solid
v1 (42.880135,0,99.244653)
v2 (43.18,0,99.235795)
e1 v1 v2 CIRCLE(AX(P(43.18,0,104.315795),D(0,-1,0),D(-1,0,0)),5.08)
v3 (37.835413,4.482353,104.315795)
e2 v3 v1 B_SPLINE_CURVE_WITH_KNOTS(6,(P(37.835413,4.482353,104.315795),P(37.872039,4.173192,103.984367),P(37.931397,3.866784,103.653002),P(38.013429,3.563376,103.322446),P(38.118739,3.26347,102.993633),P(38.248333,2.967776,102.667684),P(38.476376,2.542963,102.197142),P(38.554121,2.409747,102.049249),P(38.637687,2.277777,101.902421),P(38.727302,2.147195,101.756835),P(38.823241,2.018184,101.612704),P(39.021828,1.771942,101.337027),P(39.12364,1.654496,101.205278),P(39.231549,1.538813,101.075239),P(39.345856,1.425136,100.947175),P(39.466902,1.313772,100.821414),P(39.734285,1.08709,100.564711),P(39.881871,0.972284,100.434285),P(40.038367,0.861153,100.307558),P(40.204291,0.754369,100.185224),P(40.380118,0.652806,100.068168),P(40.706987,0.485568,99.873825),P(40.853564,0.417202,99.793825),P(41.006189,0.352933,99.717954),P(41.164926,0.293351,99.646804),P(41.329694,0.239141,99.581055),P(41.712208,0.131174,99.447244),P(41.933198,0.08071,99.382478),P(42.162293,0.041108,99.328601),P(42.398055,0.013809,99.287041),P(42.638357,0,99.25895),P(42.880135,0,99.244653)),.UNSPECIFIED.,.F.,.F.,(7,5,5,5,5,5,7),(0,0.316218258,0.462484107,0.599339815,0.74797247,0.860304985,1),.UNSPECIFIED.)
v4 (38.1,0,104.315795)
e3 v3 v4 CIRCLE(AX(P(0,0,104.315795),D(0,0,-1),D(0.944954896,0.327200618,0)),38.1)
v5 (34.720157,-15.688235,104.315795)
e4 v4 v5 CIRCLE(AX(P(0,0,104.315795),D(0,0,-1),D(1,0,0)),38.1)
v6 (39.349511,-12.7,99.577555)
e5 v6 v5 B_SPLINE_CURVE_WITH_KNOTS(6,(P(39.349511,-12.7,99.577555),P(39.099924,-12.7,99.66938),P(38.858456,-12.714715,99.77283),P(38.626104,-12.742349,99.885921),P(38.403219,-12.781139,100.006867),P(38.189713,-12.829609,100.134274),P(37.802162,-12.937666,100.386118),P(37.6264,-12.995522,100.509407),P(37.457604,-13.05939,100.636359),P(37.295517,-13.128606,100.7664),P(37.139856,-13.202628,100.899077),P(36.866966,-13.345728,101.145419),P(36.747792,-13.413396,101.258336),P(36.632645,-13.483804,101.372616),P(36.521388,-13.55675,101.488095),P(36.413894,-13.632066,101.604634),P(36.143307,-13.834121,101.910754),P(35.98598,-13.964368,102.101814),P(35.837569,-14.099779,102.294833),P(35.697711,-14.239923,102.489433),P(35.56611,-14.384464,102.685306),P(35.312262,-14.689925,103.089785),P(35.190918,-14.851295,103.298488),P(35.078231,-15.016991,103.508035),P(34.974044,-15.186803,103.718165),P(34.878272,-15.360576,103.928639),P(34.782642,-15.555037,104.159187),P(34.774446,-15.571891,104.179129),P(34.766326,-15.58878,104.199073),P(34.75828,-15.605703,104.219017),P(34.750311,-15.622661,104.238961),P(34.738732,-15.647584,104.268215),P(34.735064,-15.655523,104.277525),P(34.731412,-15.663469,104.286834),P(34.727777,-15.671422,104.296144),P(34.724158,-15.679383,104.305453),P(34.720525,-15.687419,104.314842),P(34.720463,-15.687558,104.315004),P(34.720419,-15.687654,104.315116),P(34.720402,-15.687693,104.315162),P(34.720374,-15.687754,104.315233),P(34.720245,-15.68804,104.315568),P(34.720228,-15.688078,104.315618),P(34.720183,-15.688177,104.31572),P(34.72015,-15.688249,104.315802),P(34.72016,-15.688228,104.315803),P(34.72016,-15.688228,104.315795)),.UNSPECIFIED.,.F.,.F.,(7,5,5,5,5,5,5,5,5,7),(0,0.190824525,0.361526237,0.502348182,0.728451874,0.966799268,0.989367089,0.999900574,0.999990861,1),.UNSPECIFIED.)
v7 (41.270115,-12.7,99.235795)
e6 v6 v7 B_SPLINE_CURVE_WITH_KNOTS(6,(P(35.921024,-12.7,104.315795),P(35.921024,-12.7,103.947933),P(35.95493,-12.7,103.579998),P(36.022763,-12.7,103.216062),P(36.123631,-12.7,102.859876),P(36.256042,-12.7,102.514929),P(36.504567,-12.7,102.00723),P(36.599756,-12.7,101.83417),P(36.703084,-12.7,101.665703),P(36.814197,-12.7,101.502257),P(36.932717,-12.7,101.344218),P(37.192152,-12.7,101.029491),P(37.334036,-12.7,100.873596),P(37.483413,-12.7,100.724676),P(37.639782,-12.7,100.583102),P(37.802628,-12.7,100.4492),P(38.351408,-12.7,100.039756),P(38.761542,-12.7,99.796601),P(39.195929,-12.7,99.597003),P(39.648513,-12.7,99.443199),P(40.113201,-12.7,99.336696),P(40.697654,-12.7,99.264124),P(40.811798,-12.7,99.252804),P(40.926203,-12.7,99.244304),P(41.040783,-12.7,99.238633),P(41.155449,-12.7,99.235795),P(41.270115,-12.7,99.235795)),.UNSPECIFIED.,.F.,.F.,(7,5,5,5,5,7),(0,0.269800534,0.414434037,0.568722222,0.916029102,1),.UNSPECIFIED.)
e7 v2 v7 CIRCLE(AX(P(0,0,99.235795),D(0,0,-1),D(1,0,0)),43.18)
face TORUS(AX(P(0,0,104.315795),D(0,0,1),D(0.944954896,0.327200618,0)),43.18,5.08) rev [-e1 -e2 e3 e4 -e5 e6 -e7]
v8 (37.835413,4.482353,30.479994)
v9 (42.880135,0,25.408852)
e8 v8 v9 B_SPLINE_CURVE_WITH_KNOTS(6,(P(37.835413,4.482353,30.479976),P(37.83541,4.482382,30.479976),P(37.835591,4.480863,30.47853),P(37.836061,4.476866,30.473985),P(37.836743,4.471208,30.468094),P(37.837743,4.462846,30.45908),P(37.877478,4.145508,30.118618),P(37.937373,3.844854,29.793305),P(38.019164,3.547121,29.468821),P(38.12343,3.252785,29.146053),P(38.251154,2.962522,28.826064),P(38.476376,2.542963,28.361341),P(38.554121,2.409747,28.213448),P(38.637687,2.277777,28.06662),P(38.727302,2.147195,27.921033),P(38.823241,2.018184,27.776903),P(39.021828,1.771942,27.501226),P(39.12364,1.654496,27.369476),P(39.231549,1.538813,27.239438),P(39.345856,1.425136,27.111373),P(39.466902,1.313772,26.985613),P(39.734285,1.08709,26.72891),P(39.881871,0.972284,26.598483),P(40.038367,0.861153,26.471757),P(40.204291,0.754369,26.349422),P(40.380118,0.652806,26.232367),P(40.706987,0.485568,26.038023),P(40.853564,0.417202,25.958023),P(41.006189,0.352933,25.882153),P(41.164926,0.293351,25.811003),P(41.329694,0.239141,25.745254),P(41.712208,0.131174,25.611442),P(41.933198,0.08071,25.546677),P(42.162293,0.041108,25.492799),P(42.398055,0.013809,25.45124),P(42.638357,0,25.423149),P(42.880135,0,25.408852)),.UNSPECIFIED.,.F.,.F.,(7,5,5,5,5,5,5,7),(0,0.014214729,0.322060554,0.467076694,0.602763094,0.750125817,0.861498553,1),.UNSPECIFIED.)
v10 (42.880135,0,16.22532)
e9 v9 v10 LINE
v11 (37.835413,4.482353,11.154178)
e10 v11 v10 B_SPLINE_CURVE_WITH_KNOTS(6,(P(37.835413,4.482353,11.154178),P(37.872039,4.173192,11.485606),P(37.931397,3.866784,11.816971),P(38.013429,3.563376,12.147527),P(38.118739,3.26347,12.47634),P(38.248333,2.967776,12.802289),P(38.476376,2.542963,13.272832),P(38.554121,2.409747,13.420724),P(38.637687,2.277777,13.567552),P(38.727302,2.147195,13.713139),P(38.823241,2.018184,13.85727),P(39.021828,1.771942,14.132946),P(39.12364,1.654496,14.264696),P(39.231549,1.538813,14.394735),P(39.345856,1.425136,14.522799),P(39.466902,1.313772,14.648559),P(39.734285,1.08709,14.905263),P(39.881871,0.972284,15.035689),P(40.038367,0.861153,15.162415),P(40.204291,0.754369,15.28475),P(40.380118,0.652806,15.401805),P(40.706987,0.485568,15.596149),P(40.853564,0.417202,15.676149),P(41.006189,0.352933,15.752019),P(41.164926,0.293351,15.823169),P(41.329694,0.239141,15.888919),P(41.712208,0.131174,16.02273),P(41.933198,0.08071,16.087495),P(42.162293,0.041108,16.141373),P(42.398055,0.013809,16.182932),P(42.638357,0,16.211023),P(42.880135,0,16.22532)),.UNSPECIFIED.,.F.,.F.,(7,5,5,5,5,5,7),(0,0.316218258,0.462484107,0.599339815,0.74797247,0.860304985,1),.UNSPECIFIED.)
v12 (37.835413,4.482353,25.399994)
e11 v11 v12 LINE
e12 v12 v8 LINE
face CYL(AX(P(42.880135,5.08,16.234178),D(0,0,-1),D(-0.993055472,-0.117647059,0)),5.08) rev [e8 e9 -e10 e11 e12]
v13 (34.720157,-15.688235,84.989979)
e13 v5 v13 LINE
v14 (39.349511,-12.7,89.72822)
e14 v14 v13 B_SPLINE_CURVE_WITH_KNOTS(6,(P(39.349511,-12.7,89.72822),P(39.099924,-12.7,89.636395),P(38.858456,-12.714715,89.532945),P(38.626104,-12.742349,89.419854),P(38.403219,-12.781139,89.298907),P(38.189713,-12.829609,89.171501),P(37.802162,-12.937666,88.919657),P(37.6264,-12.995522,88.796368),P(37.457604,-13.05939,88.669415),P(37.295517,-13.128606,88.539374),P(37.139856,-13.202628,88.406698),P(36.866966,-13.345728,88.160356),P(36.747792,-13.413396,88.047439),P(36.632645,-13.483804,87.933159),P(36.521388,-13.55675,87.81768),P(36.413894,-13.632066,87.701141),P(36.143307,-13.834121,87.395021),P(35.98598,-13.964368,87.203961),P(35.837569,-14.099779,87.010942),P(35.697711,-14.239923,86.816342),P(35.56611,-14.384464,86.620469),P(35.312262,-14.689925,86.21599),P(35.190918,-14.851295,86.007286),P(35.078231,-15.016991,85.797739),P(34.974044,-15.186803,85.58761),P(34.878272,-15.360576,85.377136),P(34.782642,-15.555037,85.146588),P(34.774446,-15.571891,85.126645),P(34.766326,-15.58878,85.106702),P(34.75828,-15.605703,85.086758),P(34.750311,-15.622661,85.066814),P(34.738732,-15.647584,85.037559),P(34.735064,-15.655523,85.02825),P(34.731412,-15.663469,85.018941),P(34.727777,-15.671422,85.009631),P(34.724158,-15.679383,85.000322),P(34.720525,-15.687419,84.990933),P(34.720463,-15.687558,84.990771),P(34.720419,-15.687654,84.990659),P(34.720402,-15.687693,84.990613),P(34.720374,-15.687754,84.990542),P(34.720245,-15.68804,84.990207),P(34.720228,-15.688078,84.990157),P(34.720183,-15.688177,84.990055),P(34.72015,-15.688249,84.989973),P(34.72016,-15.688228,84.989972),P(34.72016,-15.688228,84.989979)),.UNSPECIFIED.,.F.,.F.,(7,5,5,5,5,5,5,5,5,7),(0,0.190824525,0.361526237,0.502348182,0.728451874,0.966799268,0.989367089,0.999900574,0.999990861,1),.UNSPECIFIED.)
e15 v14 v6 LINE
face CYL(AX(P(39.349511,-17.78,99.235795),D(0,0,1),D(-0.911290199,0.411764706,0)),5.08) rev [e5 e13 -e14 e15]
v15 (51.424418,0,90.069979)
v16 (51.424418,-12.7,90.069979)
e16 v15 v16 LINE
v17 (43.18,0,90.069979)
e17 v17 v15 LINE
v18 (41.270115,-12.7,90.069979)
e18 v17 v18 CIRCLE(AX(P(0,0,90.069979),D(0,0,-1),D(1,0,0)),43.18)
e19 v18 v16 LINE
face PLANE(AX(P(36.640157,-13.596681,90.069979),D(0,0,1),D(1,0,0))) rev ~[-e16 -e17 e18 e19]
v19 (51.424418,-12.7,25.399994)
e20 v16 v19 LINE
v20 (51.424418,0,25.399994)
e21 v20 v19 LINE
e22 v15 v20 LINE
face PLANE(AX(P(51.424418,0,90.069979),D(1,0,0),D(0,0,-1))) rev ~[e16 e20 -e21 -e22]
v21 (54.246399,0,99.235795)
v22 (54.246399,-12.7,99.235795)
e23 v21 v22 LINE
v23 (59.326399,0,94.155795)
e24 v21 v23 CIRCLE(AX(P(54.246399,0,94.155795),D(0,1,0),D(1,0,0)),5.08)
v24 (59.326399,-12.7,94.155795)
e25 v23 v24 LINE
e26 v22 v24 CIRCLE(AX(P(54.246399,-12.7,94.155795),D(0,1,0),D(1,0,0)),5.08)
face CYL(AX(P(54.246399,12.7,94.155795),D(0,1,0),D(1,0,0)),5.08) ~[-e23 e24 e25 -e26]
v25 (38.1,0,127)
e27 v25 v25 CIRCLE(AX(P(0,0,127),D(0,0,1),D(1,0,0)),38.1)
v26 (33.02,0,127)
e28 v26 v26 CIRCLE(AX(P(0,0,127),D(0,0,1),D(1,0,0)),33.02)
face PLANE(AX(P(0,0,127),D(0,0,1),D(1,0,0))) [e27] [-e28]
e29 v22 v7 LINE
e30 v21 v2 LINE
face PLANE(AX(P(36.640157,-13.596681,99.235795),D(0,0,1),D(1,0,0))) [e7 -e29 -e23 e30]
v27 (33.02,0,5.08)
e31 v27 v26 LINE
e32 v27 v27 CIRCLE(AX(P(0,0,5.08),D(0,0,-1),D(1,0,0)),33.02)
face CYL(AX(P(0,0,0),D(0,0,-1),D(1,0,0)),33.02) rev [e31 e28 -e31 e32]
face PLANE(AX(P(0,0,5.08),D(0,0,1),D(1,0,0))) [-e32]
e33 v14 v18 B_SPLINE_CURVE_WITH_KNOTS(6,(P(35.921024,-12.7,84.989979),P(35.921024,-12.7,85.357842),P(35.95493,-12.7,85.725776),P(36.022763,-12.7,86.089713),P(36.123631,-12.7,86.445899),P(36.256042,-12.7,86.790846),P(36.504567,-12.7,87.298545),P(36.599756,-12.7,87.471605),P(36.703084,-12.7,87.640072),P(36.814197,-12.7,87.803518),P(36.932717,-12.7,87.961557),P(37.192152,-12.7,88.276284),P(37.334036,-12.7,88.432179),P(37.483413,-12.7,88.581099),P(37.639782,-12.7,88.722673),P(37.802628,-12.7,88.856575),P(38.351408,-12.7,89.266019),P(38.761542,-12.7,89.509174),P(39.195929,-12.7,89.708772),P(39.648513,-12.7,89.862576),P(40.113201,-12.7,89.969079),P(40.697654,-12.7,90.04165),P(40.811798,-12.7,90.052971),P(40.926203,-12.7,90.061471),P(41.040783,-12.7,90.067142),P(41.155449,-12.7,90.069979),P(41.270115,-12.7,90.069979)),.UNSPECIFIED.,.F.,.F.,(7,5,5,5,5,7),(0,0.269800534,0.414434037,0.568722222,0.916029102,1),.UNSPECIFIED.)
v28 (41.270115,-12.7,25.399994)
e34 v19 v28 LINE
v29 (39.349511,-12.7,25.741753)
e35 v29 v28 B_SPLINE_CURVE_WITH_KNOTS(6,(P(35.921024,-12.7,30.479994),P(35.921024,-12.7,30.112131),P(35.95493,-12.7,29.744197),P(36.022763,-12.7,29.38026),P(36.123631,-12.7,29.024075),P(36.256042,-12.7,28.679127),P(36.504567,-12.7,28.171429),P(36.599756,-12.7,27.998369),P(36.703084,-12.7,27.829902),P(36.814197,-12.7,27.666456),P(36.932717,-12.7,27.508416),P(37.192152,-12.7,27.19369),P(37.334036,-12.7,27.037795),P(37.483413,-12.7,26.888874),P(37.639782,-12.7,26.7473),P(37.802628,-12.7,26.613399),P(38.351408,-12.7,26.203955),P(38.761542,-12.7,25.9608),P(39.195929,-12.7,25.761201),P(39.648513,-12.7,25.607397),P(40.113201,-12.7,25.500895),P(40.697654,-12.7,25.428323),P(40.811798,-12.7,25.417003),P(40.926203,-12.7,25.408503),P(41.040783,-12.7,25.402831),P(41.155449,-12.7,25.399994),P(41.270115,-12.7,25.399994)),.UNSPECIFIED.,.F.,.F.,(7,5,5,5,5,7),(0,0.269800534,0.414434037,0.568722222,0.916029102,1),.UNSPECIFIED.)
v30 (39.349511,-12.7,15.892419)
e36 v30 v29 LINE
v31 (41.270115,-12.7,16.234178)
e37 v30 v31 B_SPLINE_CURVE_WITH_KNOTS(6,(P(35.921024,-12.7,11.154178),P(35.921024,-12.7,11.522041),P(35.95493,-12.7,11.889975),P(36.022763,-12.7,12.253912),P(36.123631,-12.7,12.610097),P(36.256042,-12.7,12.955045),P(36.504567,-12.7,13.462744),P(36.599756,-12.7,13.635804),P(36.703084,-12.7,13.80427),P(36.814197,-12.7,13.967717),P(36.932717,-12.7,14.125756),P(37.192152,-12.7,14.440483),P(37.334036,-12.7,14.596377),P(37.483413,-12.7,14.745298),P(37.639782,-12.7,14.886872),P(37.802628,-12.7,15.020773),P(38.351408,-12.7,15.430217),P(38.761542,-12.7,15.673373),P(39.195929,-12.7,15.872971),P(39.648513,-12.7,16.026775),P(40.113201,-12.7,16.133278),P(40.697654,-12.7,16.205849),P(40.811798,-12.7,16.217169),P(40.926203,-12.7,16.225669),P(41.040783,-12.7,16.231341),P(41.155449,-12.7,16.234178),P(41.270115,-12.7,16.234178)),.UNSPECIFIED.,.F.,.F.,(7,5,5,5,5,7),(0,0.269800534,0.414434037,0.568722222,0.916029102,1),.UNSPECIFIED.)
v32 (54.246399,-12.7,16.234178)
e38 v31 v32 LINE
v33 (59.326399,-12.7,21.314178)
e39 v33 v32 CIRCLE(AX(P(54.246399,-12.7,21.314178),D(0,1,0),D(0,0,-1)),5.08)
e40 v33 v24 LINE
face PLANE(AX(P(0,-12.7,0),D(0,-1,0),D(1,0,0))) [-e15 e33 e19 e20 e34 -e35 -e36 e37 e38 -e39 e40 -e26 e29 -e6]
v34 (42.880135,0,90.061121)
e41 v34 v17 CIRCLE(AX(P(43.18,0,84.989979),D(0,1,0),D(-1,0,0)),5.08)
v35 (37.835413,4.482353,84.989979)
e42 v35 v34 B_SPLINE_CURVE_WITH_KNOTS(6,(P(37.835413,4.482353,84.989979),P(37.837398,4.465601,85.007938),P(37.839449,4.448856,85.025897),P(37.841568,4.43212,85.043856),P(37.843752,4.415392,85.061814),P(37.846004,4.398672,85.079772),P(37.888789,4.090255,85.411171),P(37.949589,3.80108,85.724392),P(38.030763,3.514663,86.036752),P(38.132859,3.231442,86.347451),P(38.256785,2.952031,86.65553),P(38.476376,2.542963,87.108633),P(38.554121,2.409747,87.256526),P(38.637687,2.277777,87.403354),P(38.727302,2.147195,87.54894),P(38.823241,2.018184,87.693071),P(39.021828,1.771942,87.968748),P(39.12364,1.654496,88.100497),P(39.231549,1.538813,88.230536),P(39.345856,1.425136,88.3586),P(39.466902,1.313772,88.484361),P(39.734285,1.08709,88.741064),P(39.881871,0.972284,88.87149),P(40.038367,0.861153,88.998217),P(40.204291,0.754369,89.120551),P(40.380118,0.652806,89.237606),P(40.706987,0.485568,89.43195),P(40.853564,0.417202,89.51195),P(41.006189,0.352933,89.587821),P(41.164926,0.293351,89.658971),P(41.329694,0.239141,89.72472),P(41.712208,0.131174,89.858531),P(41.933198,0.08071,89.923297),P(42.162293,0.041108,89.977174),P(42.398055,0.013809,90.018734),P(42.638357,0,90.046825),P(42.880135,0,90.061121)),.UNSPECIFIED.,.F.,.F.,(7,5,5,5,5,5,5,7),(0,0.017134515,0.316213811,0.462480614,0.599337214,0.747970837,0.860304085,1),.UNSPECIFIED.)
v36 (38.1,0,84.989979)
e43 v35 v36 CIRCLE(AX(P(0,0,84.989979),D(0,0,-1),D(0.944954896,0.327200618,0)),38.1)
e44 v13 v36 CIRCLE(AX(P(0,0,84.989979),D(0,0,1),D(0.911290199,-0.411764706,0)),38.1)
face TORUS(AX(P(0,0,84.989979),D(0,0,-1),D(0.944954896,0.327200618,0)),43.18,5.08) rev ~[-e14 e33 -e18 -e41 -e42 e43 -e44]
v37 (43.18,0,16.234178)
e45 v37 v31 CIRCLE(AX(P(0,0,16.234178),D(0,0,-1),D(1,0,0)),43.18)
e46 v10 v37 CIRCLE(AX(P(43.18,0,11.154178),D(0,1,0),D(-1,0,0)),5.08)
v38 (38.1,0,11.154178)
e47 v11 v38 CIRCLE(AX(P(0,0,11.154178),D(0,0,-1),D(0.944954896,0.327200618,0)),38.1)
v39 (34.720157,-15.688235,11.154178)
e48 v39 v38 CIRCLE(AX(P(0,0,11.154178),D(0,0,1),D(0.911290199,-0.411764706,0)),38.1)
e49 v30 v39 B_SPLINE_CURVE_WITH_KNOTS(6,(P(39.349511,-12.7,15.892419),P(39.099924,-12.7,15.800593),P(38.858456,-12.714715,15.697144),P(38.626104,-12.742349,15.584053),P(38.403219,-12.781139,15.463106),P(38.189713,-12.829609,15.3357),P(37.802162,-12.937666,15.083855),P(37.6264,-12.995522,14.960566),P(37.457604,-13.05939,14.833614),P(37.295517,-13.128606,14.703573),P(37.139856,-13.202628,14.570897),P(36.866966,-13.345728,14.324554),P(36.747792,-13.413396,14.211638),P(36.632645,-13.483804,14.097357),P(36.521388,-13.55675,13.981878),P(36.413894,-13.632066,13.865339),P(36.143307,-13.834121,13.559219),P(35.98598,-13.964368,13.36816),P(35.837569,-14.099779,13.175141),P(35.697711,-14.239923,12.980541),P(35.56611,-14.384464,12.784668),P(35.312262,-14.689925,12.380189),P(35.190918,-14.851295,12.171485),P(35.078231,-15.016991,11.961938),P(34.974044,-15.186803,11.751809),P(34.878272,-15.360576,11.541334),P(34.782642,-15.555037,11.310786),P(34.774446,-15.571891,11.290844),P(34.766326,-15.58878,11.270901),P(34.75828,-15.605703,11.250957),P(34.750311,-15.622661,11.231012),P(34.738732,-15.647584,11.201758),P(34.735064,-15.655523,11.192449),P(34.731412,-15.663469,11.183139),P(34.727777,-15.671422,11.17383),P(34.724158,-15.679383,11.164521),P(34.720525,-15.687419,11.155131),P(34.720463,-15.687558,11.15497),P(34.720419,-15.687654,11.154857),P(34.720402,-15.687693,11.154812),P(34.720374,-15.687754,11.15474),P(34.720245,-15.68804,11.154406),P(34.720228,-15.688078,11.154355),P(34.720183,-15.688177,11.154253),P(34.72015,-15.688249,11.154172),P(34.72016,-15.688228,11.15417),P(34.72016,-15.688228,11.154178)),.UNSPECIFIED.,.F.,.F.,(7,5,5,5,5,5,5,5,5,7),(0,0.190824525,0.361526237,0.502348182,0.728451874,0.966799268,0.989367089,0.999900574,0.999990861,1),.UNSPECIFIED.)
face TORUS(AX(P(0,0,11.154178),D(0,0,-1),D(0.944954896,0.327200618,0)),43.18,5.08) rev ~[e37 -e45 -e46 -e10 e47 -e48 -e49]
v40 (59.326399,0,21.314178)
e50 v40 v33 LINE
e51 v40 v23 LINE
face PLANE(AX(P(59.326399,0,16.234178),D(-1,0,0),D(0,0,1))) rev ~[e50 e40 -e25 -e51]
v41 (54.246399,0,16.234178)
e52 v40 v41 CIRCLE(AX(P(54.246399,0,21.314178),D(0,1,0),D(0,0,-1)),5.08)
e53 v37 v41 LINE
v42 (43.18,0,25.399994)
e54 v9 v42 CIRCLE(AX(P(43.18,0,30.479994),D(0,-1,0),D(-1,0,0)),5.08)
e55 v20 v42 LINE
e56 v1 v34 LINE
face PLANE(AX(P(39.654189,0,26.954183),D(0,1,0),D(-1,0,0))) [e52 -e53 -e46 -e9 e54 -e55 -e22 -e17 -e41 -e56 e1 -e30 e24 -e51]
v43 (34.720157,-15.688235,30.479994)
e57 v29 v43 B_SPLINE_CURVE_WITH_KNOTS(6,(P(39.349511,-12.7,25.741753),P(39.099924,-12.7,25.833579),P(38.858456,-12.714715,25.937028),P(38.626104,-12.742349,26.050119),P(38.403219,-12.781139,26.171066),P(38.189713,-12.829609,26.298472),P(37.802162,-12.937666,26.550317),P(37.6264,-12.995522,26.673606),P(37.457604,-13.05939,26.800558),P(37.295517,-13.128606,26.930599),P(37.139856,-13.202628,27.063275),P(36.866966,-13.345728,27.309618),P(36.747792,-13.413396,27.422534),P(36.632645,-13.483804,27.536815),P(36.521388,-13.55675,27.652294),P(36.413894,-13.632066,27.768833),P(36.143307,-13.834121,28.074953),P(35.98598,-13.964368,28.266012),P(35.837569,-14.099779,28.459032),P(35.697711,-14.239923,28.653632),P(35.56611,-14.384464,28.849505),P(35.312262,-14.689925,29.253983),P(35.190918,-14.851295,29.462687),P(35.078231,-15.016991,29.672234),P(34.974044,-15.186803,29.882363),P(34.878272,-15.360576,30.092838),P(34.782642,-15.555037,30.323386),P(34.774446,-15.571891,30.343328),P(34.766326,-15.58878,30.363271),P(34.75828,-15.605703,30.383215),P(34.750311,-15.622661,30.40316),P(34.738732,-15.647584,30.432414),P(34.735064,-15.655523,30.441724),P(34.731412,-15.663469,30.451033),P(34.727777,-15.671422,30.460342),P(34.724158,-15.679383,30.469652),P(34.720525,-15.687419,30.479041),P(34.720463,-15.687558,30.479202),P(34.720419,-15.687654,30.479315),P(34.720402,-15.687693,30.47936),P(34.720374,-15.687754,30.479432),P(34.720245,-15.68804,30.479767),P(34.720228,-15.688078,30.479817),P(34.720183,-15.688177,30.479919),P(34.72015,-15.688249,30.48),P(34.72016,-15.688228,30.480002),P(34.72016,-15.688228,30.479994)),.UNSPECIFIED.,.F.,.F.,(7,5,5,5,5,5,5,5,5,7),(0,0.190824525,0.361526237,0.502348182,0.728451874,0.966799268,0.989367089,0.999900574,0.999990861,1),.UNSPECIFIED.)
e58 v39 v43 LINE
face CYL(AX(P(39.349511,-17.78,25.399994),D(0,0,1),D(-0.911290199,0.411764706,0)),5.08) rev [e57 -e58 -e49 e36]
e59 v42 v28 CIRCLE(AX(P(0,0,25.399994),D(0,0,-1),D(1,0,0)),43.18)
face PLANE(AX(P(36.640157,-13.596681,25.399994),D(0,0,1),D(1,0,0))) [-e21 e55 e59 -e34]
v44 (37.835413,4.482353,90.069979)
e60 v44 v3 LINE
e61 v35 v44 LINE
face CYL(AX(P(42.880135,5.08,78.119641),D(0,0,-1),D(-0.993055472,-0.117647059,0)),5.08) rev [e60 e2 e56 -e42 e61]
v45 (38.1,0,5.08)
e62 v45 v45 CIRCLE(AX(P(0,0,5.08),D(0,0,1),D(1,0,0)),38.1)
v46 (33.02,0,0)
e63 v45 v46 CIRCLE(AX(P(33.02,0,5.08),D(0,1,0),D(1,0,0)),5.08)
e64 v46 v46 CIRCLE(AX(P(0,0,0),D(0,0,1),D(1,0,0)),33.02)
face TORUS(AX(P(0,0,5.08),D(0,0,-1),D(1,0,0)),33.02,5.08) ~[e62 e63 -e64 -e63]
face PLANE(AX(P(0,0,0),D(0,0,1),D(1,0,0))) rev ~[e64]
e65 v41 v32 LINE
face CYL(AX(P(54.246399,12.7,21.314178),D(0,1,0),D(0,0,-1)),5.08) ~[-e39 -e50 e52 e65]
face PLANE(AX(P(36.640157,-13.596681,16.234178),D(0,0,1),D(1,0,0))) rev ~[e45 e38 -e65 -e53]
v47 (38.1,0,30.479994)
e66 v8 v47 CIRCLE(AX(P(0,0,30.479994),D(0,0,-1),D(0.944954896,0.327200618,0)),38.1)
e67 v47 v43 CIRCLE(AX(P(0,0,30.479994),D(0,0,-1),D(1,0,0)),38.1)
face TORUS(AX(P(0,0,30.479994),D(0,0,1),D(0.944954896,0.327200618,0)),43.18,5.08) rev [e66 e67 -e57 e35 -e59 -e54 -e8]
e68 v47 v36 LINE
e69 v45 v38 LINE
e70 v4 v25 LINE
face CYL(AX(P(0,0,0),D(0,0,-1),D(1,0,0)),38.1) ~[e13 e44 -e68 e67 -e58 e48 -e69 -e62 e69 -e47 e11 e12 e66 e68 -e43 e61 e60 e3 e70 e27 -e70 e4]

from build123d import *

# Parameters (mm, degrees)
F0_R          = 38.1
F1_DEPTH      = 127
F2_T          = -5.08
F4_DEPTH      = 12.7
F5_T1_DEPTH   = 9.165816009
F5_T3_DEPTH   = 9.165816009
F5_T8_ANGLE   = 38.5701728076
F5_T13_ANGLE  = 38.5701728076
F5_T18_ANGLE  = 38.5701728076
F5_T23_ANGLE  = 38.5701728076
F5_T29_DEPTH  = 17.737031792
F5_T33_ANGLE  = 38.5701728076
F5_T40_ANGLE  = 38.5701728076
F5_T44_DEPTH  = 17.737031792
F5_T51_DEPTH  = 17.737031792
F5_T55_ANGLE  = 38.5701728076
F5_T62_ANGLE  = 38.5701728076
F5_T66_DEPTH  = 17.737031792
F5_T73_ANGLE  = 57.6691249807
F5_T77_DEPTH  = 21.1161541615
F5_T84_ANGLE  = 57.6691249807
F5_T88_DEPTH  = 21.1161541615
F5_T95_ANGLE  = 57.6691249807
F5_T99_DEPTH  = 21.1161541615
F5_T106_ANGLE = 57.6691249807
F5_T110_DEPTH = 21.1161541615
F5_T113_DEPTH = 38.1


# Not quite as in the source:
# - a fillet or chamfer that OpenCascade refuses, or shapes differently, is made with other operations: its cross-section is extruded or revolved along the edge and cut away or added


with BuildPart() as f1:
    # F0 (on Top) → F1 (new body)
    with BuildSketch(Plane.XY):
        Circle(F0_R)
    extrude(amount=F1_DEPTH)

    # F2
    f2_openings = [f1.faces().sort_by_distance(p)[0] for p in [
        (0, 0, 127),
    ]]
    offset(amount=F2_T, openings=f2_openings)

    # F3 (on Front) → F4 (join)
    with BuildSketch(Plane.XZ):
        Polygon((59.3263991177, 99.2357954383), (35.6448739767, 99.2357954383), (35.6448739767, 90.0699794292), (51.4244176447, 90.0699794292), (51.4244176447, 25.3999941051), (35.6448739767, 25.3999941051), (35.6448739767, 16.2341780961), (59.3263991177, 16.2341780961), align=None)
    extrude(amount=F4_DEPTH)

    # F5: fillet of radius 5.08 on 11 edges, made by hand

    # F5_s2 → F5_t1 (join)
    with BuildSketch(Plane.XY.offset(16.2341780961)):
        with BuildLine():
            ThreePointArc((34.720156586, -15.6882352941), (36.5944939832, -13.5119463039), (39.3495107975, -12.7))
            Line((39.3495107975, -12.7), (35.9210244843, -12.7))
            ThreePointArc((35.9210244843, -12.7), (35.3521781973, -14.2068116305), (34.720156586, -15.6882352941))
        make_face()
        with BuildLine():
            ThreePointArc((37.8354134656, 4.4823529412), (39.5059425471, 1.2824713919), (42.880135261, 0))
            Line((42.880135261, 0), (38.1, 0))
            ThreePointArc((38.1, 0), (38.0337958468, 2.2450776113), (37.8354134656, 4.4823529412))
        make_face()
    extrude(amount=F5_T1_DEPTH)

    # F5_s4 → F5_t3 (join)
    with BuildSketch(Plane.XY.offset(90.0699794292)):
        with BuildLine():
            ThreePointArc((34.720156586, -15.6882352941), (36.5944939832, -13.5119463039), (39.3495107975, -12.7))
            Line((39.3495107975, -12.7), (35.9210244843, -12.7))
            ThreePointArc((35.9210244843, -12.7), (35.3521781973, -14.2068116305), (34.720156586, -15.6882352941))
        make_face()
        with BuildLine():
            ThreePointArc((37.8354134656, 4.4823529412), (39.5059425471, 1.2824713919), (42.880135261, 0))
            Line((42.880135261, 0), (38.1, 0))
            ThreePointArc((38.1, 0), (38.0337958468, 2.2450776113), (37.8354134656, 4.4823529412))
        make_face()
    extrude(amount=F5_T3_DEPTH)


with BuildPart() as f5_tool6:
    # F5_s7 → F5_t8 (revolve)
    with BuildSketch(Plane.XZ):
        with BuildLine():
            ThreePointArc((38.1, 104.3157954383), (39.5878975516, 100.7236929899), (43.18, 99.2357954383))
            Line((43.18, 99.2357954383), (38.1, 99.2357954383))
            Line((38.1, 99.2357954383), (38.1, 104.3157954383))
        make_face()
    revolve(axis=Axis((0, 0, 99.2357954383), (0, 0, -1)), revolution_arc=F5_T8_ANGLE)

    split(bisect_by=Plane.XZ.offset(12.7), keep=Keep.BOTTOM)


with BuildPart() as f1_1:
    add(f1.part)

    # F5_t5: union F5_tool6
    add(f5_tool6.part)


with BuildPart() as f5_tool11:
    # F5_s12 → F5_t13 (revolve)
    with BuildSketch(Plane.XZ):
        with BuildLine():
            ThreePointArc((38.1, 84.9899794292), (39.5878975516, 88.5820818777), (43.18, 90.0699794292))
            Line((43.18, 90.0699794292), (38.1, 90.0699794292))
            Line((38.1, 90.0699794292), (38.1, 84.9899794292))
        make_face()
    revolve(axis=Axis((0, 0, 90.0699794292), (0, 0, -1)), revolution_arc=F5_T13_ANGLE)

    split(bisect_by=Plane.XZ.offset(12.7), keep=Keep.BOTTOM)


with BuildPart() as f1_2:
    add(f1_1.part)

    # F5_t10: union F5_tool11
    add(f5_tool11.part)


with BuildPart() as f5_tool16:
    # F5_s17 → F5_t18 (revolve)
    with BuildSketch(Plane.XZ):
        with BuildLine():
            ThreePointArc((38.1, 11.1541780961), (39.5878975516, 14.7462805445), (43.18, 16.2341780961))
            Line((43.18, 16.2341780961), (38.1, 16.2341780961))
            Line((38.1, 16.2341780961), (38.1, 11.1541780961))
        make_face()
    revolve(axis=Axis((0, 0, 16.2341780961), (0, 0, -1)), revolution_arc=F5_T18_ANGLE)

    split(bisect_by=Plane.XZ.offset(12.7), keep=Keep.BOTTOM)


with BuildPart() as f1_3:
    add(f1_2.part)

    # F5_t15: union F5_tool16
    add(f5_tool16.part)


with BuildPart() as f5_tool21:
    # F5_s22 → F5_t23 (revolve)
    with BuildSketch(Plane.XZ):
        with BuildLine():
            ThreePointArc((38.1, 30.4799941051), (39.5878975516, 26.8878916567), (43.18, 25.3999941051))
            Line((43.18, 25.3999941051), (38.1, 25.3999941051))
            Line((38.1, 25.3999941051), (38.1, 30.4799941051))
        make_face()
    revolve(axis=Axis((0, 0, 25.3999941051), (0, 0, -1)), revolution_arc=F5_T23_ANGLE)

    split(bisect_by=Plane.XZ.offset(12.7), keep=Keep.BOTTOM)


with BuildPart() as f1_4:
    add(f1_3.part)

    # F5_t20: union F5_tool21
    add(f5_tool21.part)


with BuildPart() as f5_tool27:
    # F5_s28 → F5_t29 (new body)
    with BuildSketch(Plane.XY.offset(33.9712098881)):
        with BuildLine():
            ThreePointArc((34.720156586, -15.6882352941), (36.5944939832, -13.5119463039), (39.3495107975, -12.7))
            Line((39.3495107975, -12.7), (35.9210244843, -12.7))
            ThreePointArc((35.9210244843, -12.7), (35.3521781973, -14.2068116305), (34.720156586, -15.6882352941))
        make_face()
    extrude(amount=-F5_T29_DEPTH)

    split(bisect_by=Plane.XY.offset(25.3999941051), keep=Keep.TOP)


with BuildPart() as f5_tool31:
    # F5_s32 → F5_t33 (revolve)
    with BuildSketch(Plane.XZ):
        with BuildLine():
            ThreePointArc((38.1, 30.4799941051), (39.5878975516, 26.8878916567), (43.18, 25.3999941051))
            Line((43.18, 25.3999941051), (38.1, 25.3999941051))
            Line((38.1, 25.3999941051), (38.1, 30.4799941051))
        make_face()
    revolve(axis=Axis((0, 0, 25.3999941051), (0, 0, -1)), revolution_arc=F5_T33_ANGLE)

    split(bisect_by=Plane.XZ.offset(12.7), keep=Keep.TOP)


with BuildPart() as f5_tool27_1:
    add(f5_tool27.part)

    # F5_t35: intersect F5_tool31
    add(f5_tool31.part, mode=Mode.INTERSECT)


with BuildPart() as f1_5:
    add(f1_4.part)

    # F5_t25: union F5_tool27
    add(f5_tool27_1.part)


with BuildPart() as f5_tool38:
    # F5_s39 → F5_t40 (revolve)
    with BuildSketch(Plane.XZ):
        with BuildLine():
            ThreePointArc((38.1, 11.1541780961), (39.5878975516, 14.7462805445), (43.18, 16.2341780961))
            Line((43.18, 16.2341780961), (38.1, 16.2341780961))
            Line((38.1, 16.2341780961), (38.1, 11.1541780961))
        make_face()
    revolve(axis=Axis((0, 0, 16.2341780961), (0, 0, -1)), revolution_arc=F5_T40_ANGLE)

    split(bisect_by=Plane.XZ.offset(12.7), keep=Keep.TOP)


with BuildPart() as f5_tool42:
    # F5_s43 → F5_t44 (new body)
    with BuildSketch(Plane.XY.offset(25.3999941051)):
        with BuildLine():
            ThreePointArc((34.720156586, -15.6882352941), (36.5944939832, -13.5119463039), (39.3495107975, -12.7))
            Line((39.3495107975, -12.7), (35.9210244843, -12.7))
            ThreePointArc((35.9210244843, -12.7), (35.3521781973, -14.2068116305), (34.720156586, -15.6882352941))
        make_face()
    extrude(amount=-F5_T44_DEPTH)

    split(bisect_by=Plane.XY.offset(16.2341780961), keep=Keep.BOTTOM)


with BuildPart() as f5_tool38_1:
    add(f5_tool38.part)

    # F5_t46: intersect F5_tool42
    add(f5_tool42.part, mode=Mode.INTERSECT)


with BuildPart() as f1_6:
    add(f1_5.part)

    # F5_t36: union F5_tool38
    add(f5_tool38_1.part)


with BuildPart() as f5_tool49:
    # F5_s50 → F5_t51 (new body)
    with BuildSketch(Plane.XY.offset(107.8070112213)):
        with BuildLine():
            ThreePointArc((34.720156586, -15.6882352941), (36.5944939832, -13.5119463039), (39.3495107975, -12.7))
            Line((39.3495107975, -12.7), (35.9210244843, -12.7))
            ThreePointArc((35.9210244843, -12.7), (35.3521781973, -14.2068116305), (34.720156586, -15.6882352941))
        make_face()
    extrude(amount=-F5_T51_DEPTH)

    split(bisect_by=Plane.XY.offset(99.2357954383), keep=Keep.TOP)


with BuildPart() as f5_tool53:
    # F5_s54 → F5_t55 (revolve)
    with BuildSketch(Plane.XZ):
        with BuildLine():
            ThreePointArc((38.1, 104.3157954383), (39.5878975516, 100.7236929899), (43.18, 99.2357954383))
            Line((43.18, 99.2357954383), (38.1, 99.2357954383))
            Line((38.1, 99.2357954383), (38.1, 104.3157954383))
        make_face()
    revolve(axis=Axis((0, 0, 99.2357954383), (0, 0, -1)), revolution_arc=F5_T55_ANGLE)

    split(bisect_by=Plane.XZ.offset(12.7), keep=Keep.TOP)


with BuildPart() as f5_tool49_1:
    add(f5_tool49.part)

    # F5_t57: intersect F5_tool53
    add(f5_tool53.part, mode=Mode.INTERSECT)


with BuildPart() as f1_7:
    add(f1_6.part)

    # F5_t47: union F5_tool49
    add(f5_tool49_1.part)


with BuildPart() as f5_tool60:
    # F5_s61 → F5_t62 (revolve)
    with BuildSketch(Plane.XZ):
        with BuildLine():
            ThreePointArc((38.1, 84.9899794292), (39.5878975516, 88.5820818777), (43.18, 90.0699794292))
            Line((43.18, 90.0699794292), (38.1, 90.0699794292))
            Line((38.1, 90.0699794292), (38.1, 84.9899794292))
        make_face()
    revolve(axis=Axis((0, 0, 90.0699794292), (0, 0, -1)), revolution_arc=F5_T62_ANGLE)

    split(bisect_by=Plane.XZ.offset(12.7), keep=Keep.TOP)


with BuildPart() as f5_tool64:
    # F5_s65 → F5_t66 (new body)
    with BuildSketch(Plane.XY.offset(99.2357954383)):
        with BuildLine():
            ThreePointArc((34.720156586, -15.6882352941), (36.5944939832, -13.5119463039), (39.3495107975, -12.7))
            Line((39.3495107975, -12.7), (35.9210244843, -12.7))
            ThreePointArc((35.9210244843, -12.7), (35.3521781973, -14.2068116305), (34.720156586, -15.6882352941))
        make_face()
    extrude(amount=-F5_T66_DEPTH)

    split(bisect_by=Plane.XY.offset(90.0699794292), keep=Keep.BOTTOM)


with BuildPart() as f5_tool60_1:
    add(f5_tool60.part)

    # F5_t68: intersect F5_tool64
    add(f5_tool64.part, mode=Mode.INTERSECT)


with BuildPart() as f1_8:
    add(f1_7.part)

    # F5_t58: union F5_tool60
    add(f5_tool60_1.part)


with BuildPart() as f5_tool71:
    # F5_s72 → F5_t73 (revolve)
    with BuildSketch(Plane(origin=(0, 0, 0), x_dir=(0, 0, 1), z_dir=(-0.3272006177, 0.9449548962, 0))):
        with BuildLine():
            ThreePointArc((104.3157954383, 38.1), (100.7236929899, 39.5878975516), (99.2357954383, 43.18))
            Line((99.2357954383, 43.18), (99.2357954383, 38.1))
            Line((99.2357954383, 38.1), (104.3157954383, 38.1))
        make_face()
    revolve(axis=Axis((0, 0, 99.2357954383), (0, 0, -1)), revolution_arc=F5_T73_ANGLE)

    split(bisect_by=Plane.XZ, keep=Keep.BOTTOM)


with BuildPart() as f5_tool75:
    # F5_s76 → F5_t77 (new body)
    with BuildSketch(Plane.XY.offset(90.0699794292)):
        with BuildLine():
            ThreePointArc((37.8354134656, 4.4823529412), (39.5059425471, 1.2824713919), (42.880135261, 0))
            Line((42.880135261, 0), (38.1, 0))
            ThreePointArc((38.1, 0), (38.0337958468, 2.2450776113), (37.8354134656, 4.4823529412))
        make_face()
    extrude(amount=F5_T77_DEPTH)

    split(bisect_by=Plane.XY.offset(99.2357954383), keep=Keep.TOP)


with BuildPart() as f5_tool71_1:
    add(f5_tool71.part)

    # F5_t79: intersect F5_tool75
    add(f5_tool75.part, mode=Mode.INTERSECT)


with BuildPart() as f1_9:
    add(f1_8.part)

    # F5_t69: union F5_tool71
    add(f5_tool71_1.part)


with BuildPart() as f5_tool82:
    # F5_s83 → F5_t84 (revolve)
    with BuildSketch(Plane(origin=(0, 0, 0), x_dir=(0, 0, 1), z_dir=(-0.3272006177, 0.9449548962, 0))):
        with BuildLine():
            ThreePointArc((84.9899794292, 38.1), (88.5820818777, 39.5878975516), (90.0699794292, 43.18))
            Line((90.0699794292, 43.18), (90.0699794292, 38.1))
            Line((90.0699794292, 38.1), (84.9899794292, 38.1))
        make_face()
    revolve(axis=Axis((0, 0, 90.0699794292), (0, 0, -1)), revolution_arc=F5_T84_ANGLE)

    split(bisect_by=Plane.XZ, keep=Keep.BOTTOM)


with BuildPart() as f5_tool86:
    # F5_s87 → F5_t88 (new body)
    with BuildSketch(Plane.XY.offset(78.1196412768)):
        with BuildLine():
            ThreePointArc((37.8354134656, 4.4823529412), (39.5059425471, 1.2824713919), (42.880135261, 0))
            Line((42.880135261, 0), (38.1, 0))
            ThreePointArc((38.1, 0), (38.0337958468, 2.2450776113), (37.8354134656, 4.4823529412))
        make_face()
    extrude(amount=F5_T88_DEPTH)

    split(bisect_by=Plane.XY.offset(90.0699794292), keep=Keep.BOTTOM)


with BuildPart() as f5_tool82_1:
    add(f5_tool82.part)

    # F5_t90: intersect F5_tool86
    add(f5_tool86.part, mode=Mode.INTERSECT)


with BuildPart() as f1_10:
    add(f1_9.part)

    # F5_t80: union F5_tool82
    add(f5_tool82_1.part)


with BuildPart() as f5_tool93:
    # F5_s94 → F5_t95 (revolve)
    with BuildSketch(Plane(origin=(0, 0, 0), x_dir=(0, 0, 1), z_dir=(-0.3272006177, 0.9449548962, 0))):
        with BuildLine():
            ThreePointArc((11.1541780961, 38.1), (14.7462805445, 39.5878975516), (16.2341780961, 43.18))
            Line((16.2341780961, 43.18), (16.2341780961, 38.1))
            Line((16.2341780961, 38.1), (11.1541780961, 38.1))
        make_face()
    revolve(axis=Axis((0, 0, 16.2341780961), (0, 0, -1)), revolution_arc=F5_T95_ANGLE)

    split(bisect_by=Plane.XZ, keep=Keep.BOTTOM)


with BuildPart() as f5_tool97:
    # F5_s98 → F5_t99 (new body)
    with BuildSketch(Plane.XY.offset(4.2838399436)):
        with BuildLine():
            ThreePointArc((37.8354134656, 4.4823529412), (39.5059425471, 1.2824713919), (42.880135261, 0))
            Line((42.880135261, 0), (38.1, 0))
            ThreePointArc((38.1, 0), (38.0337958468, 2.2450776113), (37.8354134656, 4.4823529412))
        make_face()
    extrude(amount=F5_T99_DEPTH)

    split(bisect_by=Plane.XY.offset(16.2341780961), keep=Keep.BOTTOM)


with BuildPart() as f5_tool93_1:
    add(f5_tool93.part)

    # F5_t101: intersect F5_tool97
    add(f5_tool97.part, mode=Mode.INTERSECT)


with BuildPart() as f1_11:
    add(f1_10.part)

    # F5_t91: union F5_tool93
    add(f5_tool93_1.part)


with BuildPart() as f5_tool104:
    # F5_s105 → F5_t106 (revolve)
    with BuildSketch(Plane(origin=(0, 0, 0), x_dir=(0, 0, 1), z_dir=(-0.3272006177, 0.9449548962, 0))):
        with BuildLine():
            ThreePointArc((30.4799941051, 38.1), (26.8878916567, 39.5878975516), (25.3999941051, 43.18))
            Line((25.3999941051, 43.18), (25.3999941051, 38.1))
            Line((25.3999941051, 38.1), (30.4799941051, 38.1))
        make_face()
    revolve(axis=Axis((0, 0, 25.3999941051), (0, 0, -1)), revolution_arc=F5_T106_ANGLE)

    split(bisect_by=Plane.XZ, keep=Keep.BOTTOM)


with BuildPart() as f5_tool108:
    # F5_s109 → F5_t110 (new body)
    with BuildSketch(Plane.XY.offset(16.2341780961)):
        with BuildLine():
            ThreePointArc((37.8354134656, 4.4823529412), (39.5059425471, 1.2824713919), (42.880135261, 0))
            Line((42.880135261, 0), (38.1, 0))
            ThreePointArc((38.1, 0), (38.0337958468, 2.2450776113), (37.8354134656, 4.4823529412))
        make_face()
    extrude(amount=F5_T110_DEPTH)

    split(bisect_by=Plane.XY.offset(25.3999941051), keep=Keep.TOP)


with BuildPart() as f5_tool104_1:
    add(f5_tool104.part)

    # F5_t112: intersect F5_tool108
    add(f5_tool108.part, mode=Mode.INTERSECT)


with BuildPart() as f1_12:
    add(f1_11.part)

    # F5_t102: union F5_tool104
    add(f5_tool104_1.part)

    # F5_s114 → F5_t113 (cut)
    with BuildSketch(Plane.XZ.offset(-12.7)):
        with BuildLine():
            ThreePointArc((59.3263991177, 94.1557954383), (57.8385015661, 97.7478978867), (54.2463991177, 99.2357954383))
            Line((54.2463991177, 99.2357954383), (59.3263991177, 99.2357954383))
            Line((59.3263991177, 99.2357954383), (59.3263991177, 94.1557954383))
        make_face()
        with BuildLine():
            ThreePointArc((54.2463991177, 16.2341780961), (57.8385015661, 17.7220756476), (59.3263991177, 21.3141780961))
            Line((59.3263991177, 21.3141780961), (59.3263991177, 16.2341780961))
            Line((59.3263991177, 16.2341780961), (54.2463991177, 16.2341780961))
        make_face()
    extrude(amount=F5_T113_DEPTH, mode=Mode.SUBTRACT)

    # F5_s115 → F5_t116 (revolve, cut)
    with BuildSketch(Plane.XZ):
        with BuildLine():
            ThreePointArc((38.1, 5.08), (36.6121024484, 1.4878975516), (33.02, 0))
            Line((33.02, 0), (38.1, 0))
            Line((38.1, 0), (38.1, 5.08))
        make_face()
    revolve(axis=Axis((0, 0, 0), (0, 0, 1)), mode=Mode.SUBTRACT)


solid = f1_12.part
